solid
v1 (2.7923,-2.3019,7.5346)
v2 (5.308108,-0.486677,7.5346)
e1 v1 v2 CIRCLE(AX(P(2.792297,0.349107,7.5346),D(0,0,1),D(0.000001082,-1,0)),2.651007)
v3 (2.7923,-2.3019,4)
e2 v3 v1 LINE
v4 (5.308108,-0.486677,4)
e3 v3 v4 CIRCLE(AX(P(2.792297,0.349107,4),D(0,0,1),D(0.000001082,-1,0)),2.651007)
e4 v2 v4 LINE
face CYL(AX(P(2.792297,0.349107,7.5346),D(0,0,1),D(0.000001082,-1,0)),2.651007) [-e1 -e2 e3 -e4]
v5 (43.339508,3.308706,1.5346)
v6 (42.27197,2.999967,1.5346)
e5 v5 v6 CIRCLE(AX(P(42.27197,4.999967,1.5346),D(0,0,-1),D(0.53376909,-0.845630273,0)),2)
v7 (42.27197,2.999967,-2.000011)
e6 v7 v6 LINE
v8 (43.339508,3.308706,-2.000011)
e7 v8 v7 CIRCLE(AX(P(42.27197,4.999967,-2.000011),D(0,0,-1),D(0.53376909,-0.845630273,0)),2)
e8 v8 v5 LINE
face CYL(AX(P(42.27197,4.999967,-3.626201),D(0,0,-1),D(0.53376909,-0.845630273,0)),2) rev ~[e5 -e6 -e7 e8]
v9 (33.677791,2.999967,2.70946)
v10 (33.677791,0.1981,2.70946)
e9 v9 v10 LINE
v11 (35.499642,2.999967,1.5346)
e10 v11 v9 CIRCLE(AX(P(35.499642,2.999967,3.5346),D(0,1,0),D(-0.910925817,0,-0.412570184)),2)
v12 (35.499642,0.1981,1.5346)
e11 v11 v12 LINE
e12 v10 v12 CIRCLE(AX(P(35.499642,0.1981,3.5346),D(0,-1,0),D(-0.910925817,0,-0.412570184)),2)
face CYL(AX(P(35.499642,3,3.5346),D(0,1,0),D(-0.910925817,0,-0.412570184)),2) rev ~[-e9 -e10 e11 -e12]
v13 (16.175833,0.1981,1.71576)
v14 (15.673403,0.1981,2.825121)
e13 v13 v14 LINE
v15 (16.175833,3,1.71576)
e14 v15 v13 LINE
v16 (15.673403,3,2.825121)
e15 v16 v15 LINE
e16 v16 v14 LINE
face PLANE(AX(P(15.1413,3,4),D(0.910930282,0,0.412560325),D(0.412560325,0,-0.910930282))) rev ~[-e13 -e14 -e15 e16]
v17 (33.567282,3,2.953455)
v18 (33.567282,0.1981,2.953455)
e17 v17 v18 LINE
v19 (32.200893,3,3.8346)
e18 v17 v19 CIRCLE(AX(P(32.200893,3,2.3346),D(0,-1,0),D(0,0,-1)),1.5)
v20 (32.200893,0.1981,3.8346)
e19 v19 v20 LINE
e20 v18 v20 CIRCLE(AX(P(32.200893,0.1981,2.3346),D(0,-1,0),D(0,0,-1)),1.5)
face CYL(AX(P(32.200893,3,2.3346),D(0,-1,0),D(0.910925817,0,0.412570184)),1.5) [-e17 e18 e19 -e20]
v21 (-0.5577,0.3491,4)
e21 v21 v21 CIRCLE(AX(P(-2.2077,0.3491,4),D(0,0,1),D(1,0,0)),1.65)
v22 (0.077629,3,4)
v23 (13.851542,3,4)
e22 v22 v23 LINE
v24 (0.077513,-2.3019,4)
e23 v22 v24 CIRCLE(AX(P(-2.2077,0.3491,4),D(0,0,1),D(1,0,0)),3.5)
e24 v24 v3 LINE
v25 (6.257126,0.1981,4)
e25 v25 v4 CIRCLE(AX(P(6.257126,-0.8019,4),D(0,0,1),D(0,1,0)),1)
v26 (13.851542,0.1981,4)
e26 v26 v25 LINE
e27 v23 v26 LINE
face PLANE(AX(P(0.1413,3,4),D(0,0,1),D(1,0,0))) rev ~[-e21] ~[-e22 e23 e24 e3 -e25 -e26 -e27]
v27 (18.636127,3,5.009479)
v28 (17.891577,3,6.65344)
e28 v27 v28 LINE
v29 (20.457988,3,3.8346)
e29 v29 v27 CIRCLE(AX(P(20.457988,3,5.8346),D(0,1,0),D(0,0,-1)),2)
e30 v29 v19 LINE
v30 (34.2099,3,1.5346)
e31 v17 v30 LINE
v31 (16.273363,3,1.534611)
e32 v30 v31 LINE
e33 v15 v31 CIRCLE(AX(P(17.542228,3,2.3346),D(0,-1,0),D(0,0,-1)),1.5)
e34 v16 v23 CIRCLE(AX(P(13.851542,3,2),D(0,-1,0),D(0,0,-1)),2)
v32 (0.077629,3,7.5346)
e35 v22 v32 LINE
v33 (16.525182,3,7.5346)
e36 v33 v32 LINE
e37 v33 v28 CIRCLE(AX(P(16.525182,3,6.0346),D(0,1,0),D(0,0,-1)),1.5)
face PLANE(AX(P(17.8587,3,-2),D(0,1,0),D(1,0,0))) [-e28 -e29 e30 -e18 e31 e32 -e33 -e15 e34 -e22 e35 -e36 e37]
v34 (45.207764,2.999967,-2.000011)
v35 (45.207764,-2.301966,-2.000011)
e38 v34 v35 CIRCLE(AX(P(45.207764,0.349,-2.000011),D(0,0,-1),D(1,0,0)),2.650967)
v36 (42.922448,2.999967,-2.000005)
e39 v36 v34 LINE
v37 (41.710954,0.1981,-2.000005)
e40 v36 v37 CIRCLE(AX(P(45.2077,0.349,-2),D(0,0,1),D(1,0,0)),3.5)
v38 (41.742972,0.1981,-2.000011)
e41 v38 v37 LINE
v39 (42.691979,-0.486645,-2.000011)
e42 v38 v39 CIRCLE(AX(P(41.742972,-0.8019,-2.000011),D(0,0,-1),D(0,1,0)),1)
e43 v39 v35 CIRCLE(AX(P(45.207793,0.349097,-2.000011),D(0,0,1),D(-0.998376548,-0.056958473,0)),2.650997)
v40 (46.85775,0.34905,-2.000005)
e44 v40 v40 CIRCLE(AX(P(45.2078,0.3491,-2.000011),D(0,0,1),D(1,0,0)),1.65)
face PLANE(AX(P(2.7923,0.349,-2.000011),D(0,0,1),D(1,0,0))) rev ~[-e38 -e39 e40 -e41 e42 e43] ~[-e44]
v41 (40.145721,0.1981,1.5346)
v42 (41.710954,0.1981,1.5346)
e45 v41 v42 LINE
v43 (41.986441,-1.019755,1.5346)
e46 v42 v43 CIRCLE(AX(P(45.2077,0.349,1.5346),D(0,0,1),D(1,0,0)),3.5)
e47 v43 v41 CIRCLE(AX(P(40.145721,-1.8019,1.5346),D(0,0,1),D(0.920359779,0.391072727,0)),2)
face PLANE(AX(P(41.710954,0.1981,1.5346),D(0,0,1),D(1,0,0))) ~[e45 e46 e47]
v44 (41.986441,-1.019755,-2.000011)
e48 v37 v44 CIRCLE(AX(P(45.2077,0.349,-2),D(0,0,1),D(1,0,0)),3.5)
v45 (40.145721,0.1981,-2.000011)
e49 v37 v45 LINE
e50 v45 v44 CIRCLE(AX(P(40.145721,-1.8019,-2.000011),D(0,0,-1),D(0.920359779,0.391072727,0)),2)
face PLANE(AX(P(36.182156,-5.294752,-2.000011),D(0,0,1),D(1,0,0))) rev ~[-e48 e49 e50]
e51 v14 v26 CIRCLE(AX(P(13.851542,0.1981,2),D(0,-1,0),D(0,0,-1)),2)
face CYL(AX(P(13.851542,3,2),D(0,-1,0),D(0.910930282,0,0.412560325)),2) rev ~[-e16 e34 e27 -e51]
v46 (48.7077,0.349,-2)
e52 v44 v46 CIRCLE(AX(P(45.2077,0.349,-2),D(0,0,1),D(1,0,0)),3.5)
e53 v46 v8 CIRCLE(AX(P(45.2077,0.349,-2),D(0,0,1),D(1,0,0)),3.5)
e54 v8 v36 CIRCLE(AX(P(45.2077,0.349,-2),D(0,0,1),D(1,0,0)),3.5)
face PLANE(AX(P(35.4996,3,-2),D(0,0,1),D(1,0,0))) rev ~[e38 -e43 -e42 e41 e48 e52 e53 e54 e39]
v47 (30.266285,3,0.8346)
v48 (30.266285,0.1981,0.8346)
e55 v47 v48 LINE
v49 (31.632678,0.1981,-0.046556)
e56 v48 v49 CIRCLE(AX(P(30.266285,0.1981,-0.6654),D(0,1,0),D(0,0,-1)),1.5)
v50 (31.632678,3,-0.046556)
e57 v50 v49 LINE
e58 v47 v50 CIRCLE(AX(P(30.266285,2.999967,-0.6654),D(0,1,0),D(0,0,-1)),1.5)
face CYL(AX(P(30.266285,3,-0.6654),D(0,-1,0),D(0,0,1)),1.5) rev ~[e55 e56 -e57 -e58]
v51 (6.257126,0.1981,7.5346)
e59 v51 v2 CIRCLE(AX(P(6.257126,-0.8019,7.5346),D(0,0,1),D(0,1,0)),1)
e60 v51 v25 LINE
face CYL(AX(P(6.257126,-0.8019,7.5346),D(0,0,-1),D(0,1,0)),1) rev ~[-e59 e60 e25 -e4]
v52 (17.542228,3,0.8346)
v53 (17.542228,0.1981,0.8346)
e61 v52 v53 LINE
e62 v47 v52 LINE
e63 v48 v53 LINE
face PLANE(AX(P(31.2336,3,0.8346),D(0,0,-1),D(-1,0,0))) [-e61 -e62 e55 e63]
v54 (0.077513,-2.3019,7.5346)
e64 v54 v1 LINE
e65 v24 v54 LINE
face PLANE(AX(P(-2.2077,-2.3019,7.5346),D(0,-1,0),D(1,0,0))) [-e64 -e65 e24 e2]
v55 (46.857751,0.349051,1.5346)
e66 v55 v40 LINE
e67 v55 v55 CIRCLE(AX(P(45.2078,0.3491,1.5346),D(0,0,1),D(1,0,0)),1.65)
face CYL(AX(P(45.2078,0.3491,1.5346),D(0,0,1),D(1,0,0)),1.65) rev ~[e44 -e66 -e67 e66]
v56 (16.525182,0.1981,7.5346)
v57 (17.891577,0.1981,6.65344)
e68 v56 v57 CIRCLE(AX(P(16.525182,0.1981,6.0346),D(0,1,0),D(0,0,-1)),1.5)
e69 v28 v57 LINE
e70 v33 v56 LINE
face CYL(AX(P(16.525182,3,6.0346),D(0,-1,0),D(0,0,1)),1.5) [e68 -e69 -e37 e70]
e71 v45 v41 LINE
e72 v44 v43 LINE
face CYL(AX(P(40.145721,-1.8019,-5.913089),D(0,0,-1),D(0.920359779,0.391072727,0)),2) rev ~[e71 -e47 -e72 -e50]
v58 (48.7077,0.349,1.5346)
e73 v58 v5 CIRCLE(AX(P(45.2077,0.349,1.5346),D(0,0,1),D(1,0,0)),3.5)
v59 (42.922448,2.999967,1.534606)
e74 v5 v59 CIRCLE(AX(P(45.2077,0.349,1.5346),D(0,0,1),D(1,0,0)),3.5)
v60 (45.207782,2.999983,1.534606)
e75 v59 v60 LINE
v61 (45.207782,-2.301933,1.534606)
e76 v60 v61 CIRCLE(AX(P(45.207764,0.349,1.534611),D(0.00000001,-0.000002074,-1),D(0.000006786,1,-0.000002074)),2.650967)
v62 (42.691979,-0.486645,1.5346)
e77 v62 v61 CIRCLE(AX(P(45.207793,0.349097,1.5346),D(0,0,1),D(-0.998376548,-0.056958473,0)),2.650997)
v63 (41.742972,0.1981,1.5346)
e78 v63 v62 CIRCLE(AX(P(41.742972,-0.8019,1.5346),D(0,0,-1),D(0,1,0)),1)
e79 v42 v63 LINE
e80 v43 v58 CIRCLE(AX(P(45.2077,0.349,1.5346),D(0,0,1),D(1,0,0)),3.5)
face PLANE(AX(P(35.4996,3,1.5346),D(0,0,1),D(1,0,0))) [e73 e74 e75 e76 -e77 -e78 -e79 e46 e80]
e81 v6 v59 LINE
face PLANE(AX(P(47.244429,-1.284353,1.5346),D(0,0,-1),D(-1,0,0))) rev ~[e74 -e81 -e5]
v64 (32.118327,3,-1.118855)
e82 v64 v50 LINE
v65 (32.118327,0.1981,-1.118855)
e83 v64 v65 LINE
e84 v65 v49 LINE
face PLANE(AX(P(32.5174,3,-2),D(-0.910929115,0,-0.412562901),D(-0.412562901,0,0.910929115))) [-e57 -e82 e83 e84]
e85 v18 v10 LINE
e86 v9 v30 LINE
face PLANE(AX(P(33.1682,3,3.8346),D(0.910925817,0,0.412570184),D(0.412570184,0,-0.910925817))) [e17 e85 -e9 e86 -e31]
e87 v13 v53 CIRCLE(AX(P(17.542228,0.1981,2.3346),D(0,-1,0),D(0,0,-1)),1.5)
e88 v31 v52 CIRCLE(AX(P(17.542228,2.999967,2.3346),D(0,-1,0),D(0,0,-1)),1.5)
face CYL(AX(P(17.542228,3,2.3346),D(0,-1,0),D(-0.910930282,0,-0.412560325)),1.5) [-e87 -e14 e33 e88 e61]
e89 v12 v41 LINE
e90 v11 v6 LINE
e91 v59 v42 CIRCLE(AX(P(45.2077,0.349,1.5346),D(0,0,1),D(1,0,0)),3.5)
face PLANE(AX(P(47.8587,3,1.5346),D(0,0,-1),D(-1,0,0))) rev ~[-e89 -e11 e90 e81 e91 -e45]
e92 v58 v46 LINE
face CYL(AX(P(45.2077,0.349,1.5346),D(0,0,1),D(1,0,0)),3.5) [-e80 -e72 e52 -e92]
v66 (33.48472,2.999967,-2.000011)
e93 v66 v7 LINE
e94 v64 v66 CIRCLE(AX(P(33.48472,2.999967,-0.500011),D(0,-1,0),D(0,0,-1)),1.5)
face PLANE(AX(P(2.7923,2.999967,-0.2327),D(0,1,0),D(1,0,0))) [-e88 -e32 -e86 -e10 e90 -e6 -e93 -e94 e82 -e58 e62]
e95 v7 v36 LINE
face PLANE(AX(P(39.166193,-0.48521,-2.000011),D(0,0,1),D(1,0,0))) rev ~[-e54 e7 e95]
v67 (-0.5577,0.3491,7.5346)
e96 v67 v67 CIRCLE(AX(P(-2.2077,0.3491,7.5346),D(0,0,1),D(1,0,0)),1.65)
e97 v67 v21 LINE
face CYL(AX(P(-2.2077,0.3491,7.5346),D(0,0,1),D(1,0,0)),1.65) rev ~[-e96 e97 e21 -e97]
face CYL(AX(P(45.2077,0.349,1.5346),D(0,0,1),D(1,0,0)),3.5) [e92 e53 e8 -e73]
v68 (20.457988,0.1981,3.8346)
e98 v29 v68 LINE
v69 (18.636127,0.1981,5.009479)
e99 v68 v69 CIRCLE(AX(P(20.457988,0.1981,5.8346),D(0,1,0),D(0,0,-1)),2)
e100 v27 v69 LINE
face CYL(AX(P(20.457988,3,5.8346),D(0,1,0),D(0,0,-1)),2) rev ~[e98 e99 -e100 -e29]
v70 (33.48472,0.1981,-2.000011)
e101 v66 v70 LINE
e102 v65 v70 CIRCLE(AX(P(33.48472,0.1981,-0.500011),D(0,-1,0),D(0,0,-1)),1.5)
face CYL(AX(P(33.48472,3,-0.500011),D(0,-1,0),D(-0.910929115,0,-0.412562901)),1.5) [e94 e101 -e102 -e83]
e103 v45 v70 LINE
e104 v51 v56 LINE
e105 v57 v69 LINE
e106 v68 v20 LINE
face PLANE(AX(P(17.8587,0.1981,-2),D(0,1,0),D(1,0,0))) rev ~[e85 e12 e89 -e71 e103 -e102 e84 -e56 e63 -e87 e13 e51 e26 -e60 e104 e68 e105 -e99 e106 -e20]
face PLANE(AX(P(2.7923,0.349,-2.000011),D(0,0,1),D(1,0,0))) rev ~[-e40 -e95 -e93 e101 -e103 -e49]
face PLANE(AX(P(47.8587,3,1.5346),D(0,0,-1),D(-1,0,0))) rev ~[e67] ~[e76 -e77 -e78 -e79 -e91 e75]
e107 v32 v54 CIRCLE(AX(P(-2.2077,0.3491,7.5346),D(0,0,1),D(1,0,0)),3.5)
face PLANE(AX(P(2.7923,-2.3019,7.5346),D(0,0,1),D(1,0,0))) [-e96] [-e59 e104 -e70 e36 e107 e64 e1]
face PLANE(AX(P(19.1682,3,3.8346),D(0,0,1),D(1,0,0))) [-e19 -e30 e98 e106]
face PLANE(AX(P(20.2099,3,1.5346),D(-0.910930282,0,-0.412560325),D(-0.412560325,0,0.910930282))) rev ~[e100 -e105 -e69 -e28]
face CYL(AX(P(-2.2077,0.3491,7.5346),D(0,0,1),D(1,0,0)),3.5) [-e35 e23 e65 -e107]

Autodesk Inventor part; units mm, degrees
ref_plane "YZ Plane" through (0, 0, 0) normal (1, 0, 0) x (0, 1, 0)
ref_plane "XZ Plane" through (0, 0, 0) normal (0, 1, 0) x (-1, 0, 0)
ref_plane "XY Plane" through (0, 0, 0) normal (0, 0, 1) x (1, 0, 0)
sketch "スケッチ1" plane through (0, 0, 0) normal (0, 0, 1) x (1, 0, 0)
  circle A0 centre (0, 0) radius 1.7
  circle A1 centre (48, 0) radius 1.7
  circle A2 centre (0, 0) radius 3
  circle A3 centre (48, 0) radius 3
  line L0 (0, 3) -> (48, 3)
  line L1 (0, -3) -> (48, -3)
  dimension "d0" = 3.4
  dimension "d1" = 3.4
  dimension "d2" = 6
  dimension "d3" = 6
  dimension "d4" = 48
extrude "押し出し1" add sketch "スケッチ1" along normal mid plane 4
offset faces "サイズ1" outward -0.05 faces at (49.6945, -0.1368, 0.6667)
offset faces "サイズ2" outward -0.05 faces at (1.6945, 0.1368, -0.6667)
scale "尺度1" factors (0.8836555, 0.8836555, 0.8836555) then translate (2.7923, 0.349, -0.2327) bodies 1
sketch "スケッチ2" plane through (2.7923, -2.3019, 1.5346) normal (0, 0, 1) x (1, 0, 0)
  circle A0 centre (0, 2.651) radius 1.5464 projected
  circle A1 centre (0, 2.651) radius 1.65
  circle A2 centre (42.4155, 2.651) radius 1.5464 projected
  circle A3 centre (42.4155, 2.651) radius 1.65
  point P0 (-2.7923, 2.3019)
  dimension "d12" = 3.3
extrude "押し出し2" cut sketch "スケッチ2" against normal up to next
sketch "スケッチ3" plane through (2.7923, -2.3019, 1.5346) normal (0, 0, 1) x (1, 0, 0)
  circle A0 centre (0, 2.651) radius 1.65 projected
  circle A1 centre (42.4155, 2.651) radius 1.65 projected
  arc A2 (0, 5.3019) -> (0, 0) centre (0, 2.651) ccw projected
  line L0 (0, 0) -> (42.4155, 0) projected
  arc A3 (42.4155, 0) -> (42.4155, 5.3019) centre (42.4155, 2.651) ccw projected
  line L1 (42.4155, 5.3019) -> (0, 5.3019) projected
  point P0 (-2.7923, 2.3019)
extrude "押し出し3" add sketch "スケッチ3" along normal blind 6
sketch "スケッチ4" plane through (2.7923, 3, -2) normal (0, 1, 0) x (1, 0, 0)
  line L0 (42.4155, -9.5346) -> (45.0664, -9.5346) projected
  line L1 (45.0664, -9.5346) -> (45.0664, -3.5346)
  line L2 (45.0664, 0) -> (45.0664, -9.5346) projected
  line L3 (45.0664, -3.5346) -> (17.4176, -3.5346)
  line L4 (-2.651, 0) -> (-2.651, -6)
  line L5 (-2.651, 0) -> (-2.651, -9.5346) projected
  line L6 (-2.651, -6) -> (12.349, -6)
  line L7 (12.349, -6) -> (15.0664, 0)
  line L8 (42.4155, 0) -> (0, 0) projected
  line L9 (15.0664, 0) -> (-2.651, 0)
  line L10 (17.4176, -3.5346) -> (14.7002, -9.5346)
  line L11 (14.7002, -9.5346) -> (45.0664, -9.5346)
  line L12 (42.4155, -9.5346) -> (0, -9.5346) projected
  line L13 (0, 0) -> (42.4155, 0) projected
  point P0 (-2.7923, -2)
  dimension "d17" = 6
  dimension "d18" = 6
  dimension "d20" = 3.6
  dimension "d21" = 30
  dimension "d22" = 15
extrude "押し出し4" cut sketch "スケッチ4" against normal through all
sketch "スケッチ5" plane through (2.7923, -2.3019, 7.5346) normal (0, 0, 1) x (1, 0, 0)
  circle A0 centre (0, 2.651) radius 1.65 projected
  line L0 (0, 0) -> (14.7002, 0) projected
  arc A1 (0, 0) -> (2.6467, 2.5) centre (0, 2.651) ccw
  line L1 (2.6467, 2.5) -> (39.7688, 2.5)
  line L2 (0, 0) -> (42.4155, 0)
  line L3 (42.4155, 0) -> (15.0664, 0) projected
  arc A2 (39.7688, 2.5) -> (42.4155, 0) centre (42.4155, 2.651) ccw
  point P0 (-2.7923, 2.3019)
  dimension "d28" = 2.5
extrude "押し出し5" cut sketch "スケッチ5" against normal up to next contours A1 L1 A2 L2 L0
fillet "フィレット1" radius 1 2 edges at (42.5611, 0.1981, -0.2327) (5.4389, 0.1981, 5.7673)
sketch "スケッチ6" plane through (2.7923, -2.3019, 7.5346) normal (0, 0, 1) x (1, 0, 0)
  circle A0 centre (-5, 2.651) radius 1.65
  circle A1 centre (-5, 2.651) radius 2.651
  arc A2 (0, 5.3019) -> (2.5158, 1.8152) centre (0, 2.651) ccw projected
  circle A3 centre (0, 2.651) radius 1.65 projected
  line L0 (-5, 0) -> (0, 0)
  arc A4 (0, 5.3019) -> (2.5158, 1.8152) centre (0, 2.651) ccw projected
  line L1 (12.349, 5.3019) -> (0, 5.3019) projected
  line L2 (-5, 5.3019) -> (0, 5.3019)
  arc A5 (0, 0) -> (0, 5.3019) centre (0, 2.651) ccw
  point P0 (-2.7923, 2.3019)
  dimension "d32" = 5
extrude "押し出し6" add sketch "スケッチ6" against normal up to surface (3.5346 mm away) contours A1 A2 | L2 A2 A1 | A1 A2 L0 | A2 A5 A1 | A1 A2 | A3
fillet "フィレット2" radius 2 2 edges at (20.2099, 1.599, 1.5346) (15.1413, 1.599, 4)
sketch "スケッチ7" plane through (17.8587, 3, -2) normal (0, 1, 0) x (1, 0, 0)
  line L0 (-0.3662, -9.5346) -> (1.8191, -4.7095) projected
  line L1 (1.3095, -5.8346) -> (15.3095, -5.8346)
  line L2 (15.3095, -5.8346) -> (16.3512, -3.5346)
  line L3 (3.6409, -3.5346) -> (23.8842, -3.5346) projected
  line L4 (16.3512, -3.5346) -> (2.3512, -3.5346)
  line L5 (2.3512, -3.5346) -> (1.3095, -5.8346)
  line L6 (-0.3662, -9.5346) -> (1.8191, -4.7095) projected
  point P0 (-17.8587, -2)
  dimension "d36" = 2.3
  dimension "d37" = 14
extrude "押し出し7" add sketch "スケッチ7" against normal up to surface (2.8019 mm away)
fillet "フィレット3" radius 2 2 edges at (19.1682, 1.599, 3.8346) (34.2099, 1.599, 1.5346)
sketch "スケッチ8" plane through (17.8587, 3, -2) normal (0, 1, 0) x (1, 0, 0)
  line L0 (0, 0) -> (27.349, 0) projected
  line L1 (14.6587, 0) -> (13.3749, -2.8346)
  line L2 (13.3749, -2.8346) -> (-1.2838, -2.8346)
  line L3 (0, 0) -> (-2.1853, -4.8251) construction
  line L4 (-1.2838, -2.8346) -> (0, 0)
  line L5 (0, 0) -> (14.6587, 0)
  line L6 (2.5993, -5.8346) -> (15.3095, -5.8346) projected
  line L7 (15.3095, -5.8346) -> (15.8191, -4.7095) projected
  point P0 (-17.8587, -2)
  dimension "d41" = 3
  dimension "d42" = 3
extrude "押し出し8" cut sketch "スケッチ8" against normal through all
fillet "フィレット4" radius 1.5 5 edges at (16.5749, 1.599, 0.8346) (31.2336, 1.599, 0.8346) (32.5174, 1.599, -2) (17.4925, 1.599, 7.5346) (33.1682, 1.599, 3.8346)
sketch "スケッチ9" plane through (2.7923, -2.3019, 7.5346) normal (0, 0, 1) x (1, 0, 0)
  circle A0 centre (-5, 2.651) radius 1.65 projected
  circle A1 centre (-5, 2.651) radius 3.5
  point P0 (-2.7923, 2.3019)
  dimension "d46" = 7
extrude "押し出し9" add sketch "スケッチ9" against normal up to surface (3.5346 mm away)
sketch "スケッチ10" plane through (35.4996, 3, 1.5346) normal (0, 0, 1) x (1, 0, 0)
  circle A0 centre (9.7081, -2.651) radius 1.65 projected
  circle A1 centre (9.7081, -2.651) radius 3.5
  point P0 (-35.4996, -3)
  dimension "d49" = 7
extrude "押し出し10" add sketch "スケッチ10" against normal up to surface (3.5346 mm away)
fillet "フィレット5" radius 2 2 edges at (42.9225, 3, -0.2327) (41.711, 0.1981, -0.2327)
properties part number "HbFingerMainCouplerLink01"
